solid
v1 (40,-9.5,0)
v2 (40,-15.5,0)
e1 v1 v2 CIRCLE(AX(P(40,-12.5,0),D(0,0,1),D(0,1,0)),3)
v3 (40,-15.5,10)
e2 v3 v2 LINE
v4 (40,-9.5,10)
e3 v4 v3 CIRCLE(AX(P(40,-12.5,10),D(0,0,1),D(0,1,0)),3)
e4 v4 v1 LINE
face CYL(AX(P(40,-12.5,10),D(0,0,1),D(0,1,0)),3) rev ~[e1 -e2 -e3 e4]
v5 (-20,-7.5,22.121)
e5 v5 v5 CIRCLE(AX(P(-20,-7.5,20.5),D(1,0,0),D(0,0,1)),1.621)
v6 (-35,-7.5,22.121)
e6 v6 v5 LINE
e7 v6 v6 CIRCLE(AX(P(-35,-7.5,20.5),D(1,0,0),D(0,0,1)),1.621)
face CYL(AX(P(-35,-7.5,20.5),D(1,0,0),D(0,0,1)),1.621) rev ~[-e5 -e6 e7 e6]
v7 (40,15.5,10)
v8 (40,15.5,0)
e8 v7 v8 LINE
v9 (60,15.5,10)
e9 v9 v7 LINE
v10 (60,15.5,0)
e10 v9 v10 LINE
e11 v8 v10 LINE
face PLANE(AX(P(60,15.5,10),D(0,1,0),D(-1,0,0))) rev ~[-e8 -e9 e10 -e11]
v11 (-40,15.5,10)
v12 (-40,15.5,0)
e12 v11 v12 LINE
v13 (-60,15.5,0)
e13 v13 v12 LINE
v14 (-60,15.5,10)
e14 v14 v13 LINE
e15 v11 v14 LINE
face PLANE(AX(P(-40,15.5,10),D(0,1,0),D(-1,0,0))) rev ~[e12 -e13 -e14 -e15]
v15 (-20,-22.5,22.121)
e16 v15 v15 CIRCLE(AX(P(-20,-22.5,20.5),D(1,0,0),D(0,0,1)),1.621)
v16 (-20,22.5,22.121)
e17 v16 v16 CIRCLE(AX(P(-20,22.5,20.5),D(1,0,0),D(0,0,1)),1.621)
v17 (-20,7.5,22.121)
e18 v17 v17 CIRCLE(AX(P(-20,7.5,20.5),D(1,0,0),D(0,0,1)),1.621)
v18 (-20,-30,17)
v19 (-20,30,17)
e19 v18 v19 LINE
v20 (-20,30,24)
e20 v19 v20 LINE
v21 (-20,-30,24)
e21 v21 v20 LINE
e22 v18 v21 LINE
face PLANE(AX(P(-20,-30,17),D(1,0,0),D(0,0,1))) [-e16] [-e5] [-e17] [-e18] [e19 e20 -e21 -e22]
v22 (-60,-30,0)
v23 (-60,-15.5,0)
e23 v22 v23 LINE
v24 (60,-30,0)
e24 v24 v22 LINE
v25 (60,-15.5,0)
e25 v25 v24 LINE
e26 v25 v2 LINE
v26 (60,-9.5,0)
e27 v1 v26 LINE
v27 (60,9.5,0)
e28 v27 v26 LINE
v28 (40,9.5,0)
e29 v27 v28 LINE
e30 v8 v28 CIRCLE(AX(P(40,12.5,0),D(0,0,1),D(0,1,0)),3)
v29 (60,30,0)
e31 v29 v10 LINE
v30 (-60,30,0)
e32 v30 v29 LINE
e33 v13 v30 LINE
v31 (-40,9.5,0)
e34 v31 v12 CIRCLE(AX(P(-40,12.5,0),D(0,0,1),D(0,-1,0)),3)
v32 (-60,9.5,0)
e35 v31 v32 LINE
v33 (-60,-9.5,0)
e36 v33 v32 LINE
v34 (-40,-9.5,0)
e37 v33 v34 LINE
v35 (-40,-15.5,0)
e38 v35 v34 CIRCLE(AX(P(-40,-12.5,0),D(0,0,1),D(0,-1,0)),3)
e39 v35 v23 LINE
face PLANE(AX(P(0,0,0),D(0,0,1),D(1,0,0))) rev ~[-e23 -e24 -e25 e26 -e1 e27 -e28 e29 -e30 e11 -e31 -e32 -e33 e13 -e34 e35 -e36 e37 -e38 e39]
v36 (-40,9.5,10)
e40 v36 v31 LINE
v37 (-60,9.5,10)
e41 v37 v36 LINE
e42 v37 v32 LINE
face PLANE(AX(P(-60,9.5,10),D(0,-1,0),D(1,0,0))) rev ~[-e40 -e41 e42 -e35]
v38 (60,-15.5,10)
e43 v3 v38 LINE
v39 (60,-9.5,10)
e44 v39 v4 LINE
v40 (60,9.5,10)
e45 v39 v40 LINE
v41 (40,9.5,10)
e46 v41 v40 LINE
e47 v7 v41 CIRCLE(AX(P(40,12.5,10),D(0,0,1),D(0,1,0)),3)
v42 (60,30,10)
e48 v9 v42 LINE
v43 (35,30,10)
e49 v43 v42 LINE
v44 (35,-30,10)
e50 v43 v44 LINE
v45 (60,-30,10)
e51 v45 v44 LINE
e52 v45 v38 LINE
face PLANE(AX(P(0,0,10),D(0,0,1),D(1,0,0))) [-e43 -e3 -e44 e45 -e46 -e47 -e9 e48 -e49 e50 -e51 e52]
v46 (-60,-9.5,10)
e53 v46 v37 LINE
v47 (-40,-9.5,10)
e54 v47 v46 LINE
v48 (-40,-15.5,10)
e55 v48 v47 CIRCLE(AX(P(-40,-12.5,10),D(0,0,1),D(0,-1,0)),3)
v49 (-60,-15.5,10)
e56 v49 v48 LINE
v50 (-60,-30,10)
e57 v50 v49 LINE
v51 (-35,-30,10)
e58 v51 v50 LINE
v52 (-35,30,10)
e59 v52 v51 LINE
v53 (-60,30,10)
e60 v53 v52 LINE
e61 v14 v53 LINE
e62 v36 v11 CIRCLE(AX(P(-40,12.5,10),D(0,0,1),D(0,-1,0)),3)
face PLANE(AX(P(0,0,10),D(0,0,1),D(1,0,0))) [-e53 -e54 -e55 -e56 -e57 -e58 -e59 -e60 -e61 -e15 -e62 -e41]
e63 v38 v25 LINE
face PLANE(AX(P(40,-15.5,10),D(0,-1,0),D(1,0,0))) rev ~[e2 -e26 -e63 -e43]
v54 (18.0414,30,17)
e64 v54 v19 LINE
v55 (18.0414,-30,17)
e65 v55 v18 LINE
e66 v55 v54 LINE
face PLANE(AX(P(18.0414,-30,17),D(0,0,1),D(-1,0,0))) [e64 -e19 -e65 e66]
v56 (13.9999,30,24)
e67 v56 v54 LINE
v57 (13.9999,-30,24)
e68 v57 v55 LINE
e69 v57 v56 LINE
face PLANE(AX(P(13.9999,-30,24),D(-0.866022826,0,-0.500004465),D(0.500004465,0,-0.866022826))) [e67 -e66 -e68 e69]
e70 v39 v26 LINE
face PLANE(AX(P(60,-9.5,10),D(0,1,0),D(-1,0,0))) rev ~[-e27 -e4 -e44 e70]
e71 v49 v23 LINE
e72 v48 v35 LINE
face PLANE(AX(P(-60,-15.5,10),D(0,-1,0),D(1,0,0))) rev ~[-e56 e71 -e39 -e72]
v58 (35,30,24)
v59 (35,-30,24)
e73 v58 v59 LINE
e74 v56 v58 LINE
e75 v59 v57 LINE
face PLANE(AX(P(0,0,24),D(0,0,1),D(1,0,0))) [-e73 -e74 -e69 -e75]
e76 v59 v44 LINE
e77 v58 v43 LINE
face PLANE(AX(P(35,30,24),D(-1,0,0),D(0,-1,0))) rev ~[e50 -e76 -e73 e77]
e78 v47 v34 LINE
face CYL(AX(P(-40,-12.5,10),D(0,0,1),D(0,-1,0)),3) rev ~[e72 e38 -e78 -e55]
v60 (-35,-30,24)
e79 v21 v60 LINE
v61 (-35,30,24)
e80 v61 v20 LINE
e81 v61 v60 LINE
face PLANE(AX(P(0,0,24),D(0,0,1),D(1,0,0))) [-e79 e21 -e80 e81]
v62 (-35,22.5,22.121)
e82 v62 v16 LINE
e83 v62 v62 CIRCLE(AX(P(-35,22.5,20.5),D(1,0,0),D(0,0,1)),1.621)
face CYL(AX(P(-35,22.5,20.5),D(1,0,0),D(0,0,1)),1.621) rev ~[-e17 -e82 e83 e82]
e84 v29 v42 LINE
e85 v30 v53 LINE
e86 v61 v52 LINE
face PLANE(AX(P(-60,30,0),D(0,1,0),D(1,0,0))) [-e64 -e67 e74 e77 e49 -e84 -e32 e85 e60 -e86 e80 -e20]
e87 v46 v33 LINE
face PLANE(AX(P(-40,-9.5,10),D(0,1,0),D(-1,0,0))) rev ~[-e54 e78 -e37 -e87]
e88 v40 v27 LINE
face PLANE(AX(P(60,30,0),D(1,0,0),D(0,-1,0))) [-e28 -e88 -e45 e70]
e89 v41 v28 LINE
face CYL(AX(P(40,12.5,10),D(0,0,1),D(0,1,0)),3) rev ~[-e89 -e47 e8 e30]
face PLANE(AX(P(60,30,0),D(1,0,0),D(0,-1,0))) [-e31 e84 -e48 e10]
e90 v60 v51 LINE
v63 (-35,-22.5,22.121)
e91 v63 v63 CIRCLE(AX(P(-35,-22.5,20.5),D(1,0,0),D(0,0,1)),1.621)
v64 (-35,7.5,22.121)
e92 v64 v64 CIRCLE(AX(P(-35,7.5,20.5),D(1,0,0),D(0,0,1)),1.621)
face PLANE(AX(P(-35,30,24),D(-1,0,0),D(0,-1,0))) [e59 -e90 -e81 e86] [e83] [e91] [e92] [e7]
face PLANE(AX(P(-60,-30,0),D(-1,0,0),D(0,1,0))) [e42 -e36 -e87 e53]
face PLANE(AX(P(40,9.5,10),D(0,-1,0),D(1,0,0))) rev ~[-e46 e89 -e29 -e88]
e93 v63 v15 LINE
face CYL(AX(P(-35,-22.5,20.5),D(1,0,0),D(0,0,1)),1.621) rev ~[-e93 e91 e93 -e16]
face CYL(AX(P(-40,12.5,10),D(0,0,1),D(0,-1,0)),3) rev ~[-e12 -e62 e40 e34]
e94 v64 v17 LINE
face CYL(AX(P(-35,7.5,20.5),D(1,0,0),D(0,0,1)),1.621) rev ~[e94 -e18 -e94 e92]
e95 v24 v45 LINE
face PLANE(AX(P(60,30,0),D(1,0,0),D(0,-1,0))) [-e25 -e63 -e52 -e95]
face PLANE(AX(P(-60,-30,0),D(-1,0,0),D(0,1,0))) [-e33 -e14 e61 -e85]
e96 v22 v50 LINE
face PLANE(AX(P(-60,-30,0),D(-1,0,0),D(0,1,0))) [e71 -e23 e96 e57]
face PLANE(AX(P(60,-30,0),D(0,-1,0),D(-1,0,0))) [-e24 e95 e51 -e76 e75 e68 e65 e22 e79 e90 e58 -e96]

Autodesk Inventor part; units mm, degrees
ref_plane "YZ Plane" through (0, 0, 0) normal (1, 0, 0) x (0, 1, 0)
ref_plane "XZ Plane" through (0, 0, 0) normal (0, 1, 0) x (-1, 0, 0)
ref_plane "XY Plane" through (0, 0, 0) normal (0, 0, 1) x (1, 0, 0)
sketch "Sketch1" plane through (0, 0, 0) normal (0, 0, 1) x (1, 0, 0)
  line L0 (0, 57.1566) -> (0, -74.2716) construction
  line L1 (-84, 0) -> (84, 0) construction
  line L2 (-60, 30) -> (60, 30)
  line L3 (60, 30) -> (60, -30)
  line L4 (60, -30) -> (-60, -30)
  line L5 (-60, -30) -> (-60, 30)
  point P0 (0, 0)
  dimension "d0" = 120
  dimension "d1" = 60
extrude "Extrusion1" add sketch "Sketch1" along normal blind 24
sketch "Sketch2" plane through (-60, -30, 0) normal (0, -1, 0) x (1, 0, 0)
  line L0 (120, 24) -> (0, 24) projected
  line L1 (60, 28.8) -> (60, -4.8) construction
  line L2 (-24, 0) -> (144, 0) construction
  line L3 (41.9586, 17) -> (78.0414, 17) construction
  line L4 (41.9586, 17) -> (46.0001, 24) construction
  line L5 (41.9586, 17) -> (50.0416, 17) construction
  line L6 (78.0414, 17) -> (63.0829, 17) construction
  line L7 (73.9999, 24) -> (46.0001, 24) construction
  line L8 (73.9999, 24) -> (78.0414, 17)
  line L9 (78.0414, 17) -> (40, 17)
  line L10 (40, 17) -> (40, 24)
  line L11 (73.9999, 24) -> (40, 24)
  point P0 (60, 0)
  point P1 (77.464, 18)
  dimension "d5" = 60
  dimension "d7" = 7
  dimension "d37" = 1
  dimension "d39" = 17.464
  dimension "d40" = 60
  dimension "d64" = 20
extrude "Extrusion2" cut sketch "Sketch2" against normal up to next
sketch "Sketch9" plane through (0, 0, 24) normal (0, 0, 1) x (1, 0, 0)
  line L0 (0, 57.1566) -> (0, -74.2716) construction
  line L1 (-84, 0) -> (84, 0) construction
  line L2 (25, 37.3826) -> (25, -38.2478) construction
  line L3 (50, 36.5596) -> (50, -55.4961) construction
  line L4 (-25, 38.3811) -> (-25, -39.94) construction
  line L5 (-50, 35.8185) -> (-50, -44.962) construction
  line L6 (-20, -30) -> (-20, 30) construction
  line L7 (-60, 30) -> (-20, 30) construction
  line L8 (-60, -30) -> (-60, 30) construction
  line L9 (-20, -30) -> (-60, -30) construction
  line L10 (13.9999, 30) -> (13.9999, -30) construction
  line L11 (60, -30) -> (13.9999, -30) construction
  line L12 (60, 30) -> (60, -30) construction
  line L13 (13.9999, 30) -> (60, 30) construction
  line L14 (60, -30) -> (-60, -30) projected
  line L15 (-60, 30) -> (-35, 30)
  line L16 (-35, 30) -> (-35, -30)
  line L17 (-35, -30) -> (-60, -30)
  line L18 (-60, -30) -> (-60, 30)
  line L19 (13.9999, 30) -> (60, 30) projected
  line L20 (60, -30) -> (13.9999, -30) projected
  line L21 (60, 30) -> (35, 30)
  line L22 (35, 30) -> (35, -30)
  line L23 (35, -30) -> (60, -30)
  line L24 (60, -30) -> (60, 30)
  point P0 (0, 0)
  dimension "d65" = 25
  dimension "d66" = 25
  dimension "d67" = 25
  dimension "d68" = 25
  dimension "d69" = 25
  dimension "d70" = 25
extrude "Extrusion7" cut sketch "Sketch9" against normal blind 14
sketch "Sketch10" plane through (0, 0, 10) normal (0, 0, 1) x (1, 0, 0)
  line L0 (-60, -30) -> (-60, 30) construction
  line L1 (-35, -30) -> (-60, -30) construction
  line L2 (-35, 30) -> (-35, -30) construction
  line L3 (-60, 30) -> (-35, 30) construction
  line L4 (60, -30) -> (35, -30) construction
  line L5 (60, 30) -> (60, -30) construction
  line L6 (35, 30) -> (60, 30) construction
  line L7 (35, -30) -> (35, 30) construction
  line L8 (-88.2, 0) -> (88.2, 0) construction
  line L9 (0, 42) -> (0, -42) construction
  line L10 (-60, -30) -> (-60, 30) construction
  line L11 (-60, 12.5) -> (60, 12.5) construction
  line L12 (60, 30) -> (60, -30) construction
  line L13 (-60, -12.5) -> (60, -12.5) construction
  line L14 (-60, 12.5) -> (-40, 12.5) construction
  line L15 (-60, 9.5) -> (-40, 9.5)
  line L16 (-40, 15.5) -> (-60, 15.5)
  arc A0 (-60, 15.5) -> (-60, 9.5) centre (-60, 12.5) ccw
  arc A1 (-40, 9.5) -> (-40, 15.5) centre (-40, 12.5) ccw
  line L17 (-60, -12.5) -> (-40, -12.5) construction
  line L18 (-60, -15.5) -> (-40, -15.5)
  line L19 (-40, -9.5) -> (-60, -9.5)
  arc A2 (-60, -9.5) -> (-60, -15.5) centre (-60, -12.5) ccw
  arc A3 (-40, -15.5) -> (-40, -9.5) centre (-40, -12.5) ccw
  line L20 (60, 12.5) -> (40, 12.5) construction
  line L21 (60, 15.5) -> (40, 15.5)
  line L22 (40, 9.5) -> (60, 9.5)
  arc A4 (60, 9.5) -> (60, 15.5) centre (60, 12.5) ccw
  arc A5 (40, 15.5) -> (40, 9.5) centre (40, 12.5) ccw
  line L23 (60, -12.5) -> (40, -12.5) construction
  line L24 (60, -9.5) -> (40, -9.5)
  line L25 (40, -15.5) -> (60, -15.5)
  arc A6 (60, -15.5) -> (60, -9.5) centre (60, -12.5) ccw
  arc A7 (40, -9.5) -> (40, -15.5) centre (40, -12.5) ccw
  point P0 (0, 0)
  point P1 (-50, 12.5)
  point P2 (-50, -12.5)
  point P3 (50, 12.5)
  point P4 (50, -12.5)
  dimension "d73" = 12.5
  dimension "d74" = 12.5
  dimension "d75" = 6
  dimension "d76" = 20
  dimension "d77" = 6
  dimension "d78" = 20
  dimension "d79" = 6
  dimension "d80" = 20
  dimension "d81" = 6
  dimension "d82" = 20
extrude "Extrusion8" cut sketch "Sketch10" against normal up to next
sketch "Sketch11" plane through (-35, -30, 24) normal (-1, 0, 0) x (0, 0, 1)
  line L0 (-7, 0) -> (-7, 60) construction
  line L1 (0, 60) -> (0, 0) construction
  line L2 (-14, 60) -> (0, 60) construction
  line L3 (-14, 60) -> (-14, 0) construction
  line L4 (0, 0) -> (-14, 0) construction
  line L5 (-3.5, 60) -> (-3.5, 0) construction
  line L6 (0, 0) -> (-14, 0) construction
  point P0 (-24, 30)
  point P1 (-3.5, 7.5)
  point P2 (-3.5, 22.5)
  point P3 (-3.5, 37.5)
  point P4 (-3.5, 52.5)
  dimension "d85" = 3.5
  dimension "d86" = 7.5
  dimension "d87" = 15
  dimension "d88" = 15
  dimension "d89" = 15
hole "Hole3" at (-35, -22.5, 20.5) at (-35, -7.5, 20.5) at (-35, 7.5, 20.5) at (-35, 22.5, 20.5) direction (1, 0, 0) diameter 3.242 end up to surface thread size "M4x0.7" class "6H" standard "ANSI Metric M Profile"
properties part number "MVX-10-Bracket-V5"
